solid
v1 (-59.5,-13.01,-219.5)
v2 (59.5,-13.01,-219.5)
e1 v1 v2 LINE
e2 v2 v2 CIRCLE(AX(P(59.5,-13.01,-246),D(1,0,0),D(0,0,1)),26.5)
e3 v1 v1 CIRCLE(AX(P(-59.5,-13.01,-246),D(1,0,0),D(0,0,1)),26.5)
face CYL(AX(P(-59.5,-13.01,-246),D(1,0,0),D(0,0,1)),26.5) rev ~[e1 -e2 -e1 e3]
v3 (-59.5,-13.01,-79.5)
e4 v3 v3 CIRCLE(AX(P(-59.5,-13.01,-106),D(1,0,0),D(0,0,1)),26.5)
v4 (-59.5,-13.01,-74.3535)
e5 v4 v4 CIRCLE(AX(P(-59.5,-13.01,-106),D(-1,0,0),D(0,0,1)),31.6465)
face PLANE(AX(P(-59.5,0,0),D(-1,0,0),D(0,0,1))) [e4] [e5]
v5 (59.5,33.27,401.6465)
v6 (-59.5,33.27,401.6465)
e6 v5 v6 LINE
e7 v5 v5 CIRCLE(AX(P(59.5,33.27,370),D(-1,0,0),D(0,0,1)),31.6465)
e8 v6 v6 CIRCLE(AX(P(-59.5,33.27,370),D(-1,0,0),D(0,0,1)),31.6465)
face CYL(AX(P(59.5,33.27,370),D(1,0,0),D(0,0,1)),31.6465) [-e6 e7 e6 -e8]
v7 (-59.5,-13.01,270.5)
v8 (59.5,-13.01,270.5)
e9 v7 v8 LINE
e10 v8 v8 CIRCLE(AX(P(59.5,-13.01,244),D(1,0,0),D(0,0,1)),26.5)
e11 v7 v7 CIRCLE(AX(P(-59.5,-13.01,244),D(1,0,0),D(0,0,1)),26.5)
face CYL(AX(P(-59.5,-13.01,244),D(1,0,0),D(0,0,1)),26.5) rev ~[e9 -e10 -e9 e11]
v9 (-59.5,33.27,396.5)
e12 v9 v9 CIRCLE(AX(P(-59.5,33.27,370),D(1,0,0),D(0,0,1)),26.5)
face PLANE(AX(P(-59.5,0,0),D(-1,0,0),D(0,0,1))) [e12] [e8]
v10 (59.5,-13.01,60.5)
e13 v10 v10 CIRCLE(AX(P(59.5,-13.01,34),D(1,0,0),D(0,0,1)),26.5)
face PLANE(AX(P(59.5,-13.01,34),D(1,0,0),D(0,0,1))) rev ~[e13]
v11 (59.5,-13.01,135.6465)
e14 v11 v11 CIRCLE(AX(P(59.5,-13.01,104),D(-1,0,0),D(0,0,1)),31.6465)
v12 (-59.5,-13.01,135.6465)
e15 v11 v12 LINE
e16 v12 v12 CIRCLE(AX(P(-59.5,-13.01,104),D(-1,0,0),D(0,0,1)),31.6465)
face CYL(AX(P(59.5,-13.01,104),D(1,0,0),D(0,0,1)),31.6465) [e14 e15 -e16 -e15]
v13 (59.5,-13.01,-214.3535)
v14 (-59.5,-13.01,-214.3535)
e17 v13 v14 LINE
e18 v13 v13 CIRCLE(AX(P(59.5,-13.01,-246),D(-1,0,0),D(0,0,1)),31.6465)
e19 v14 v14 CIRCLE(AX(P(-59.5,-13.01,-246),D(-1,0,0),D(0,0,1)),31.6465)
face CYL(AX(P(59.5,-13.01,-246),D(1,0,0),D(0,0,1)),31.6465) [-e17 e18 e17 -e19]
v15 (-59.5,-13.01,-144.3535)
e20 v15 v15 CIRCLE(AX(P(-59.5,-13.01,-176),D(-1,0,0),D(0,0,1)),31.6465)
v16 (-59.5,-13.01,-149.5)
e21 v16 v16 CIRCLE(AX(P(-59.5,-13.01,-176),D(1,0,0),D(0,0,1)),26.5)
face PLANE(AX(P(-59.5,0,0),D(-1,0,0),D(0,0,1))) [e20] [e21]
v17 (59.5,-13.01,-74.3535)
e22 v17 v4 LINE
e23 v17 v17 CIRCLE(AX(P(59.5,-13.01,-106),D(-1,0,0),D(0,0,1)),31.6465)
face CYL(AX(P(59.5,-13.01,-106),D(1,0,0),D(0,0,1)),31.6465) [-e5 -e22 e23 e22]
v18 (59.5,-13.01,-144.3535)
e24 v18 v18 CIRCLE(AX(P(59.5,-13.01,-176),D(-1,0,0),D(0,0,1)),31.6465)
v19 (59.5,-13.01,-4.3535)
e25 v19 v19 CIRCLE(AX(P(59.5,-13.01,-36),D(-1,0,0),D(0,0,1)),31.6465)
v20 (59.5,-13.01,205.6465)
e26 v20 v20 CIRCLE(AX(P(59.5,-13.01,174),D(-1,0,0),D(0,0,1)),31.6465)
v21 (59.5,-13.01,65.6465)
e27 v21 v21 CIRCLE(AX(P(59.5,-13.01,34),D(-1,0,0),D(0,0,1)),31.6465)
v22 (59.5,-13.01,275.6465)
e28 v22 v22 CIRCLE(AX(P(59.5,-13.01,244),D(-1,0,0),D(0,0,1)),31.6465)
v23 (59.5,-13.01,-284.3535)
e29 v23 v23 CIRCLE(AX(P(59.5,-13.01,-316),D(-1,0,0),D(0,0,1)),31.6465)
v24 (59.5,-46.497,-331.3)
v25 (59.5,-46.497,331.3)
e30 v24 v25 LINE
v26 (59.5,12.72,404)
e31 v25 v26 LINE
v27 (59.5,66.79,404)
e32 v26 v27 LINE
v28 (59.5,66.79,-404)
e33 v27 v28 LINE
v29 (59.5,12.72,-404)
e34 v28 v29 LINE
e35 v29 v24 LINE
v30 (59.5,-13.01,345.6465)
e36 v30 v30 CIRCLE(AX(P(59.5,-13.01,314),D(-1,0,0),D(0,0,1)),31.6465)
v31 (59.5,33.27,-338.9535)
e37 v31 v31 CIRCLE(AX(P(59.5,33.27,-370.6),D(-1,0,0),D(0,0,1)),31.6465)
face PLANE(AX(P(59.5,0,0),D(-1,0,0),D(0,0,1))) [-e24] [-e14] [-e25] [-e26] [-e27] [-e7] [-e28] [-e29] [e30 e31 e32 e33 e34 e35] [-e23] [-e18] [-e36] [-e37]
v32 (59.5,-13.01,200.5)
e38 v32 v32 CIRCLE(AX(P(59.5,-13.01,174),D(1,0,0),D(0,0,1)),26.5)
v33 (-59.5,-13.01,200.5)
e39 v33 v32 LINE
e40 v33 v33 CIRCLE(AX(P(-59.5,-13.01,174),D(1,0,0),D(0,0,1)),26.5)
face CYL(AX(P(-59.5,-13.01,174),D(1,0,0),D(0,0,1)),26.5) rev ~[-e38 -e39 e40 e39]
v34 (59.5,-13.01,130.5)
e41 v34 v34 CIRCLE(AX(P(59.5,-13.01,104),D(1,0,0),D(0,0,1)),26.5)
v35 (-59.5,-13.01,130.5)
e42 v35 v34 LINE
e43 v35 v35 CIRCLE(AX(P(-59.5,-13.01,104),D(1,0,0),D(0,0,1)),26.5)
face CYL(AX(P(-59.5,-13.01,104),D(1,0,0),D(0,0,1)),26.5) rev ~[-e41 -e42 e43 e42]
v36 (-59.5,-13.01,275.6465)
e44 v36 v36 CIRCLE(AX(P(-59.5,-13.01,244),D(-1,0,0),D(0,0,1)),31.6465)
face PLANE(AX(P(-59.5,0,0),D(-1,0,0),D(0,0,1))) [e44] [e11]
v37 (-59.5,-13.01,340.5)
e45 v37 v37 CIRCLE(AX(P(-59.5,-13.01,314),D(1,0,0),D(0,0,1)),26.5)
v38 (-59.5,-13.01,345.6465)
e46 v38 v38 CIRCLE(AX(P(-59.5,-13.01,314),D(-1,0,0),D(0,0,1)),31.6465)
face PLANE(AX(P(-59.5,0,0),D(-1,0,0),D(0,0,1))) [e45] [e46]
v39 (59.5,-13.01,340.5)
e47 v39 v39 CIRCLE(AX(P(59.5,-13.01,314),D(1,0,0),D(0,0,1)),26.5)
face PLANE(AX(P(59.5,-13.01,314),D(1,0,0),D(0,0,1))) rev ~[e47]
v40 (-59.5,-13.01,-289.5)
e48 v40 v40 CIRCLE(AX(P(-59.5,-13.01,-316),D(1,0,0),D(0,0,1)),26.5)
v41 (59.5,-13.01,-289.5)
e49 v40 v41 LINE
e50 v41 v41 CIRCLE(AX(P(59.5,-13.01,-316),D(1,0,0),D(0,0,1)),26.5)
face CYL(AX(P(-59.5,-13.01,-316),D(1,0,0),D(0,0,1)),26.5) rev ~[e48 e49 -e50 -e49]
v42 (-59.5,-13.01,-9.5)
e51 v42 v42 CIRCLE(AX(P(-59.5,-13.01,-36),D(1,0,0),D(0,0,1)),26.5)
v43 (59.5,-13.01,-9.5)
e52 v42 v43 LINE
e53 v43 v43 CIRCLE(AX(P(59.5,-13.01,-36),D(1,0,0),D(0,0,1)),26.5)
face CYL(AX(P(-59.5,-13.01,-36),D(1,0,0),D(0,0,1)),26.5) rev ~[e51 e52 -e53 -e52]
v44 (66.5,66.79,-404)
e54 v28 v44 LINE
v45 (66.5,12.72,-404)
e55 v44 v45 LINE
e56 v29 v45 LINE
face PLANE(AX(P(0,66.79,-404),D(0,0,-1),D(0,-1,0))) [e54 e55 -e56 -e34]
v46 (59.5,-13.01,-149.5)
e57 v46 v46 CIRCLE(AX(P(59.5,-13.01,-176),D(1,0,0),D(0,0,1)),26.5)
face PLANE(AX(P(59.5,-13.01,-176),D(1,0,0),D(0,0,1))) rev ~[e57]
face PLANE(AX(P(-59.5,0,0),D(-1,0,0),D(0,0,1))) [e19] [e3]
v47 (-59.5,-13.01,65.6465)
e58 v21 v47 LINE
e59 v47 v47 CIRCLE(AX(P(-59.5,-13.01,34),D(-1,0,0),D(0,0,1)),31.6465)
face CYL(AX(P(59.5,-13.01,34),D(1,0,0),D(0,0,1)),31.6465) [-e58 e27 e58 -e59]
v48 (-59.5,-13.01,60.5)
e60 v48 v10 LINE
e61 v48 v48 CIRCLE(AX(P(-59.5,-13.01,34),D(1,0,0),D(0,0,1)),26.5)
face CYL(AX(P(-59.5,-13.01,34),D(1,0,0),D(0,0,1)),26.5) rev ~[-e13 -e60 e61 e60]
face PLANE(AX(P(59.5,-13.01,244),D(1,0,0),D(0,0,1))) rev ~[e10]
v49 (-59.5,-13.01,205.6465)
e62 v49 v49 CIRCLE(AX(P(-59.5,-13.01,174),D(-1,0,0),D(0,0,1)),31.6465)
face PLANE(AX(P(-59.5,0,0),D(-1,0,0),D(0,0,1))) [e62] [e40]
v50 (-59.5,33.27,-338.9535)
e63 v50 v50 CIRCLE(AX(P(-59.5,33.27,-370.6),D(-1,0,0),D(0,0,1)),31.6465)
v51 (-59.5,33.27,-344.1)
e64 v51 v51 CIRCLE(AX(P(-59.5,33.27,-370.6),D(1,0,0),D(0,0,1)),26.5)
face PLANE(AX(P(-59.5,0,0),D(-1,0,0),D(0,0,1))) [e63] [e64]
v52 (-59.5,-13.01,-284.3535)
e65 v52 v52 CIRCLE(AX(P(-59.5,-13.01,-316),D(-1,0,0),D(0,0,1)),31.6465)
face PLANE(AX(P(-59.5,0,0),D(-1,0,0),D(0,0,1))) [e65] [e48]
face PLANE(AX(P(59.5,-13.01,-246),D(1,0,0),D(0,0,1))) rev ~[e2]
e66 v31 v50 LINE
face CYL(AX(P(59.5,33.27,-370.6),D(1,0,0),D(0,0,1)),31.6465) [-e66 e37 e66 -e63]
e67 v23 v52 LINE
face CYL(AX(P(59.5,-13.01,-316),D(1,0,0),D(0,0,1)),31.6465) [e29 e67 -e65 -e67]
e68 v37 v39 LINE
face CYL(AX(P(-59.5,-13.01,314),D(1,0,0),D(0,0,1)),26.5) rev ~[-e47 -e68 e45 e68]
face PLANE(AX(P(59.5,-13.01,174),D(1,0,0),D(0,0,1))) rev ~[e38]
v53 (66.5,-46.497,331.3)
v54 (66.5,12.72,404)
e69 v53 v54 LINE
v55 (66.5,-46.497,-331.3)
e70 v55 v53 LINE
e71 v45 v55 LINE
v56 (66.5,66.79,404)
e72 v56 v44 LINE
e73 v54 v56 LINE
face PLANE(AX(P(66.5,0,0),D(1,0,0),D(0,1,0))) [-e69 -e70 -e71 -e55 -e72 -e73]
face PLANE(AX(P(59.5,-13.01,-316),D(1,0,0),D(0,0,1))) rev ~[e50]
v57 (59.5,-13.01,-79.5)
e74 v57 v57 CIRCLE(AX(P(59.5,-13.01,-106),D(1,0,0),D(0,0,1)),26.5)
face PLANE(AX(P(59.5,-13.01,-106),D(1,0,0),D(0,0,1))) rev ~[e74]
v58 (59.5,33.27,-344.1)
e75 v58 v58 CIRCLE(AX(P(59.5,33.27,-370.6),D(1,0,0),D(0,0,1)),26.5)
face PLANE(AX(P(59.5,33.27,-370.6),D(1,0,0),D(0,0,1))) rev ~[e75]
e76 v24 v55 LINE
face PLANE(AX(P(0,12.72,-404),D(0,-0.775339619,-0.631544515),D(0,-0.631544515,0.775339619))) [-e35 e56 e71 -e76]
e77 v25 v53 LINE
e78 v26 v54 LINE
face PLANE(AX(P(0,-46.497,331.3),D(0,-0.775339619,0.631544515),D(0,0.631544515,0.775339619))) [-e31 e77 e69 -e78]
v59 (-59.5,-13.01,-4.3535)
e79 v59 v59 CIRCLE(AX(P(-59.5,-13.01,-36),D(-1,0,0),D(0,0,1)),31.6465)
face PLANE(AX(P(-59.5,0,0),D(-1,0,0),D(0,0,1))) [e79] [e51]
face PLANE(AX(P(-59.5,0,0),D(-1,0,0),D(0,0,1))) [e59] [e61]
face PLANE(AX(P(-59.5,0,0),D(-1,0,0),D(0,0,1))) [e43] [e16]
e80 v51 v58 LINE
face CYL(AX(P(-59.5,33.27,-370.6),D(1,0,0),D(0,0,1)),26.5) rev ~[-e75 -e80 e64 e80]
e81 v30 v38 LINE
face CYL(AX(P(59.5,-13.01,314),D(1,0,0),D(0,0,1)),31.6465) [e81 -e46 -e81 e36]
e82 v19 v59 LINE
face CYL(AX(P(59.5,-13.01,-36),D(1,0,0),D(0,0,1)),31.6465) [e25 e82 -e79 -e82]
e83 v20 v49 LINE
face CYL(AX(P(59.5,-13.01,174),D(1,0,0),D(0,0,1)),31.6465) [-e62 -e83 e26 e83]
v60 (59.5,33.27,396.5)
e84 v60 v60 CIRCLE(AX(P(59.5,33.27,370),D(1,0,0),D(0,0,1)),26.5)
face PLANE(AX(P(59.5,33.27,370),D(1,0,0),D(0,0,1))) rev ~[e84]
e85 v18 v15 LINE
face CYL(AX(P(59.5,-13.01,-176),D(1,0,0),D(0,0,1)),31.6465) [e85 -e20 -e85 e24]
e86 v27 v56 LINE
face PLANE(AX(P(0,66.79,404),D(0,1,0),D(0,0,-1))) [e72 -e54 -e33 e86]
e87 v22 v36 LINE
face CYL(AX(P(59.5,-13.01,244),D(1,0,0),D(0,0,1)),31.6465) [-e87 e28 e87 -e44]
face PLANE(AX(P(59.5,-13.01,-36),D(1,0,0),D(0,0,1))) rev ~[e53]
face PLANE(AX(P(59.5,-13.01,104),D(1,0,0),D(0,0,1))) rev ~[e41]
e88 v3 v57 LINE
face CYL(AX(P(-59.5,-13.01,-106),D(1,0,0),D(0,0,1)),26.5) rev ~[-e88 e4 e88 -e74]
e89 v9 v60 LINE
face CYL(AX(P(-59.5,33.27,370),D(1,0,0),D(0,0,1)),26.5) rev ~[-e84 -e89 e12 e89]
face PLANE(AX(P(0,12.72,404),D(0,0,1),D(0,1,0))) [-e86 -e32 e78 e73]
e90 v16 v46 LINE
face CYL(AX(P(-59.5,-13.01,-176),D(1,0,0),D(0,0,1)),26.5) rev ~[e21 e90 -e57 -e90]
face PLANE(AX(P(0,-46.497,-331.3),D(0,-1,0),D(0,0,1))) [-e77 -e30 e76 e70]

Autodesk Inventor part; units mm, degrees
ref_plane "YZ Plane" through (0, 0, 0) normal (1, 0, 0) x (0, 1, 0)
ref_plane "XZ Plane" through (0, 0, 0) normal (0, 1, 0) x (-1, 0, 0)
ref_plane "XY Plane" through (0, 0, 0) normal (0, 0, 1) x (1, 0, 0)
sketch "Sketch1" plane through (0, 0, 0) normal (1, 0, 0) x (0, 1, 0)
  line L0 (66.79, 404) -> (66.79, -404)
  line L1 (66.79, -404) -> (12.72, -404)
  line L2 (12.72, -404) -> (-46.497, -331.3)
  line L3 (-46.497, -331.3) -> (-46.497, 331.3)
  line L4 (-46.497, 331.3) -> (12.72, 404)
  line L5 (12.72, 404) -> (66.79, 404)
  point P0 (0, 0)
  dimension "d0" = 331.3
  dimension "d1" = 331.3
  dimension "d2" = 46.497
  dimension "d3" = 46.497
  dimension "d4" = 12.72
  dimension "d5" = 12.72
  dimension "d6" = 404
  dimension "d7" = 404
  dimension "d8" = 66.79
extrude "Extrusion1" add sketch "Sketch1" along normal blind 66.5
sketch "Sketch2" plane through (0, 0, 0) normal (-1, 0, 0) x (0, 0, 1)
  line L0 (404, 66.79) -> (-404, 66.79) projected
  line L1 (-404, 66.79) -> (-404, 12.72) projected
  line L2 (-404, 12.72) -> (-331.3, -46.497) projected
  line L3 (331.3, -46.497) -> (404, 12.72) projected
  line L4 (404, 12.72) -> (404, 66.79) projected
  line L5 (404, 66.79) -> (-404, 66.79) projected
  line L6 (-404, 66.79) -> (-404, 12.72) projected
  line L7 (-404, 12.72) -> (-331.3, -46.497) projected
  line L8 (-331.3, -46.497) -> (331.3, -46.497) projected
  point P0 (0, 0)
extrude "Extrusion2" cut sketch "Sketch2" against normal blind 59.5
sketch "Sketch3" plane through (59.5, 0, 0) normal (-1, 0, 0) x (0, 0, 1)
  circle A0 centre (-370.6, 33.27) radius 31.6465
  circle A1 centre (-316, -13.01) radius 31.6465
  circle A2 centre (-246, -13.01) radius 31.6465
  circle A3 centre (-176, -13.01) radius 31.6465
  circle A4 centre (-106, -13.01) radius 31.6465
  circle A5 centre (-36, -13.01) radius 31.6465
  circle A6 centre (34, -13.01) radius 31.6465
  circle A7 centre (104, -13.01) radius 31.6465
  circle A8 centre (174, -13.01) radius 31.6465
  circle A9 centre (244, -13.01) radius 31.6465
  circle A10 centre (314, -13.01) radius 31.6465
  circle A11 centre (370, 33.27) radius 31.6465
  point P0 (0, 0)
  dimension "d13" = 33.27
  dimension "d14" = 33.27
  dimension "d15" = 370.6
  dimension "d16" = 370
  dimension "d17" = 316
  dimension "d18" = 13.01
  dimension "d19" = 70
  dimension "d20" = 70
  dimension "d21" = 70
  dimension "d22" = 70
  dimension "d23" = 70
  dimension "d24" = 70
  dimension "d25" = 70
  dimension "d26" = 70
  dimension "d27" = 70
  dimension "d28" = 13.01
  dimension "d29" = 13.01
  dimension "d30" = 13.01
  dimension "d31" = 13.01
  dimension "d32" = 13.01
  dimension "d33" = 13.01
  dimension "d34" = 13.01
  dimension "d35" = 13.01
  dimension "d36" = 13.01
  dimension "d37" = 63.293
  dimension "d38" = 63.293
  dimension "d39" = 63.293
  dimension "d40" = 63.293
  dimension "d41" = 63.293
  dimension "d42" = 63.293
  dimension "d43" = 63.293
  dimension "d44" = 63.293
  dimension "d45" = 63.293
  dimension "d46" = 63.293
  dimension "d47" = 63.293
  dimension "d48" = 63.293
extrude "Extrusion3" add sketch "Sketch3" along normal blind 119
sketch "Sketch4" plane through (-59.5, 33.27, -370.6) normal (-1, 0, 0) x (0, 0, 1)
  circle A0 centre (0, 0) radius 31.6465 projected
  point P0 (370.6, -33.27)
hole "Hole1" at (-59.5, 33.27, -370.6) direction (1, 0, 0) diameter 53 depth 119
pattern_sketch "Sketch Driven Pattern1" of "Hole1" from (59.5, 33.27, -370.6) copies at (59.5, 33.27, 370) at (59.5, -13.01, -316) at (59.5, -13.01, -246) at (59.5, -13.01, -176) at (59.5, -13.01, -106) at (59.5, -13.01, -36) at (59.5, -13.01, 34) at (59.5, -13.01, 104) at (59.5, -13.01, 174) at (59.5, -13.01, 244) at (59.5, -13.01, 314)
properties part number "Enemy_Track_inertia"
